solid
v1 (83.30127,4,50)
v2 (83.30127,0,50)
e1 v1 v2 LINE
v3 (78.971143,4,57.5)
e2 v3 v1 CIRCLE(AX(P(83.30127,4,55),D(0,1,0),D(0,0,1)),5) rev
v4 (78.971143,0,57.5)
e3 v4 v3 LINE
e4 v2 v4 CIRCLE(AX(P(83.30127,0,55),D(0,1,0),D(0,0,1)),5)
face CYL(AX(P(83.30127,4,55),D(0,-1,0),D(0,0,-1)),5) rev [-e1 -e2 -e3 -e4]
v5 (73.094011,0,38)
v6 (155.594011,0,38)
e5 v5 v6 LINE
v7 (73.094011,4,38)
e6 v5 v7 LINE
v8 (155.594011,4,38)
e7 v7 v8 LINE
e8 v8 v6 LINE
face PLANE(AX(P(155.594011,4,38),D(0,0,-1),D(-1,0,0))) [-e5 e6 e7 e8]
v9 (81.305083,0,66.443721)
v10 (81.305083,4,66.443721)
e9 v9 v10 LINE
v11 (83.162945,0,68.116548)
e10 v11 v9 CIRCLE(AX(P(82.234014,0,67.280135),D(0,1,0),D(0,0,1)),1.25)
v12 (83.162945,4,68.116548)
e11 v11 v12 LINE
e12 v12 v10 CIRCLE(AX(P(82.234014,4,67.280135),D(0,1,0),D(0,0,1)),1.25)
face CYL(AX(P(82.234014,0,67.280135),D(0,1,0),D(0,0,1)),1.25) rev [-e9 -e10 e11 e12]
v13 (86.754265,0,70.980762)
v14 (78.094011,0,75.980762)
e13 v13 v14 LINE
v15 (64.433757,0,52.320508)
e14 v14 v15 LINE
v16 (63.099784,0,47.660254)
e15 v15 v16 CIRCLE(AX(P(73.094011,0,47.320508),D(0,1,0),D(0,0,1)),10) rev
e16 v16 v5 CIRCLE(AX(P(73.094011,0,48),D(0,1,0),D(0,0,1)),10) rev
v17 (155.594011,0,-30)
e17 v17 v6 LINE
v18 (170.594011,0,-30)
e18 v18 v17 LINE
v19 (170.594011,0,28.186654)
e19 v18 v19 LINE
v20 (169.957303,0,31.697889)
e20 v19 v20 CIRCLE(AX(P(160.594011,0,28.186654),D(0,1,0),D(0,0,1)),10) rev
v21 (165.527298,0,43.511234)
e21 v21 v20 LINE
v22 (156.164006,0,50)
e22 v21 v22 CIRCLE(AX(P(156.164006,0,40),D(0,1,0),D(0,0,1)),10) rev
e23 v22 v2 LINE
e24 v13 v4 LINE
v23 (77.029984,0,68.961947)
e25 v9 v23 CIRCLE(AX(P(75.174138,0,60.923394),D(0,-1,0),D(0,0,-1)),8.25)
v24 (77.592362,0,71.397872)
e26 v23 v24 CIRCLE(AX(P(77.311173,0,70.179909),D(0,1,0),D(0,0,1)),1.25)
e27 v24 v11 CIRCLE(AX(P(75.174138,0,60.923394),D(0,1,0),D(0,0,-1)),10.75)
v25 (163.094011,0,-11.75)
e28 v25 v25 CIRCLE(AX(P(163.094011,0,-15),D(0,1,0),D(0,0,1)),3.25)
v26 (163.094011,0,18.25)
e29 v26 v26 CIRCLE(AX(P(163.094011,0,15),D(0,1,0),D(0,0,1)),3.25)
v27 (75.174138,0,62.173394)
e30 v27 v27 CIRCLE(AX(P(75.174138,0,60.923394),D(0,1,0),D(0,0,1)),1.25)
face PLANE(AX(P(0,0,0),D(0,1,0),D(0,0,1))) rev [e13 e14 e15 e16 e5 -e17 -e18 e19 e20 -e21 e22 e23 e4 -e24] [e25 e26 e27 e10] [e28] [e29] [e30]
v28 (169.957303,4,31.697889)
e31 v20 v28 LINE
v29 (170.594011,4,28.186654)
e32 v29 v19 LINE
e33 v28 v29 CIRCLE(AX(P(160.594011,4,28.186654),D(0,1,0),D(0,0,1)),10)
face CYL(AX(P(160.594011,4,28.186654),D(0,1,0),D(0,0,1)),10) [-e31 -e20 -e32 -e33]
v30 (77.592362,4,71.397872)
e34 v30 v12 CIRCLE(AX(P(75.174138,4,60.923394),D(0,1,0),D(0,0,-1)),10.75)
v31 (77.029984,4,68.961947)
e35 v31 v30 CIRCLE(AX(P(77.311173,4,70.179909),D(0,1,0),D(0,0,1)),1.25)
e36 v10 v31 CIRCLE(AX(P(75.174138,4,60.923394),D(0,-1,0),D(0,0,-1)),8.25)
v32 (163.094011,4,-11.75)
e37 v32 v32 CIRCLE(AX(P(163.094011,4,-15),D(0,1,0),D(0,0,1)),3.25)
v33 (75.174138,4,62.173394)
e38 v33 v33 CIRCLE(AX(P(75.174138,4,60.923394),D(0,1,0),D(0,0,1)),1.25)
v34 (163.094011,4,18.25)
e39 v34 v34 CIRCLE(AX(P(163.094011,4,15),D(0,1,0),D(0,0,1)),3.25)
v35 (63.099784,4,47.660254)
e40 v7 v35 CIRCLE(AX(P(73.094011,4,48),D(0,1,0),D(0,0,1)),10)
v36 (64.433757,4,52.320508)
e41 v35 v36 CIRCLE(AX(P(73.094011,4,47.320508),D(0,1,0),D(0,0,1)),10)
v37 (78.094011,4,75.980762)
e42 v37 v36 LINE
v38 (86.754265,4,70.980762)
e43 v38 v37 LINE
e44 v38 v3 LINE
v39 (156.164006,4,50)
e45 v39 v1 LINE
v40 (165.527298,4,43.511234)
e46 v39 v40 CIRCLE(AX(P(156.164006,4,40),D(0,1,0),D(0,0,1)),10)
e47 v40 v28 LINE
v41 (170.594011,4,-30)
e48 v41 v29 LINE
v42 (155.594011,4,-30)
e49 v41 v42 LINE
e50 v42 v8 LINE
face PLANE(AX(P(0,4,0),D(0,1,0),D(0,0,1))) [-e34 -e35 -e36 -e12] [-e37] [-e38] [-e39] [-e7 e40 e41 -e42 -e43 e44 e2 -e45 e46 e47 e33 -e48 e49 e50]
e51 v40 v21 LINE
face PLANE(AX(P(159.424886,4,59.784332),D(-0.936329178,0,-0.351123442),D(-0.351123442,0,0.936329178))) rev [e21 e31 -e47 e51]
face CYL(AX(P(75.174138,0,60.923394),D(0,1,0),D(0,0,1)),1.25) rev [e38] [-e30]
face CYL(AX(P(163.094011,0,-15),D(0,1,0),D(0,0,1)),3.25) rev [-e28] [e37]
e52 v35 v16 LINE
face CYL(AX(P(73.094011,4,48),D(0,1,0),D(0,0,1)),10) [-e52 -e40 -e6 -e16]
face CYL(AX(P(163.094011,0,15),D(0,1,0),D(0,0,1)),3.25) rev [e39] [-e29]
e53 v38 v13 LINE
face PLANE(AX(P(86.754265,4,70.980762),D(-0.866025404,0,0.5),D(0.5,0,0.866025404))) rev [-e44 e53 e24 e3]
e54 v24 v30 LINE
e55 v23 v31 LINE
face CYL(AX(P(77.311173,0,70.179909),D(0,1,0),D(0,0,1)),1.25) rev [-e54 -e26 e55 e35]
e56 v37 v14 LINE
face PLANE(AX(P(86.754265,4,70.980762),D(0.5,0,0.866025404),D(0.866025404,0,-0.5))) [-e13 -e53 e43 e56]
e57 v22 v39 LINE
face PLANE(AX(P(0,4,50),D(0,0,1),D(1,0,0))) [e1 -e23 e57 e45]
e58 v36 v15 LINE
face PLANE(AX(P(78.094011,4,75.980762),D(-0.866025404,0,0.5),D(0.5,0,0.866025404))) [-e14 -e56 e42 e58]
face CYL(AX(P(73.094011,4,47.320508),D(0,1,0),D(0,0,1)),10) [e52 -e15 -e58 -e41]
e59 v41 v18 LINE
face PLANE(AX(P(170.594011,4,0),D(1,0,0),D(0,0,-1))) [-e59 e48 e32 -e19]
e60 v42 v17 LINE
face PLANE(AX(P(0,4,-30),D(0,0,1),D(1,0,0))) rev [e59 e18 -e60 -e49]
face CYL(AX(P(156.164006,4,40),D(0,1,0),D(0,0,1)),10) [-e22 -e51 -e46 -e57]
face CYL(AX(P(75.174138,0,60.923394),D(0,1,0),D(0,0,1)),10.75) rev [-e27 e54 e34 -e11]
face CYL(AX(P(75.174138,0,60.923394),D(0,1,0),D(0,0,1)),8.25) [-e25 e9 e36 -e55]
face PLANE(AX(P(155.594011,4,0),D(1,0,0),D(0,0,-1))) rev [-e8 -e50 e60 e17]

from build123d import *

# Parameters (mm, degrees)
BOSS_EXTRUDE1_DEPTH = 4
SKETCH2_W           = 92.5
SKETCH2_H           = 8
CUT_EXTRUDE1_DEPTH  = 187.792378648
SKETCH3_R           = 1.25
CUT_EXTRUDE2_DEPTH  = 187.792378648
SKETCH4_R           = 3.25
CUT_EXTRUDE3_DEPTH  = 187.792378648
FILLET1_R           = 10
FILLET2_R           = 5
CUT_EXTRUDE4_DEPTH  = 187.792378648


with BuildPart() as part:
    # Sketch1 → Boss-Extrude1 (new body)
    with BuildSketch(Plane(origin=(0, 0, 0), x_dir=(1, 0, 0), z_dir=(0, 1, 0))):
        Polygon((155.594010768, -30), (63.094010768, -30), (63.094010768, -50), (78.094010768, -75.980762114), (86.754264805, -70.980762114), (74.641016151, -50), (163.094010768, -50), (170.594010768, -30), (170.594010768, 30), (155.594010768, 30), align=None)
    extrude(amount=BOSS_EXTRUDE1_DEPTH)

    # Sketch2 → Cut-Extrude1 (cut, through all)
    with BuildSketch(Plane(origin=(0, 0, 0), x_dir=(1, 0, 0), z_dir=(0, 1, 0))):
        with Locations((109.344010768, -34)):
            Rectangle(SKETCH2_W, SKETCH2_H)
    extrude(amount=CUT_EXTRUDE1_DEPTH, mode=Mode.SUBTRACT)

    # Sketch3 → Cut-Extrude2 (cut, through all)
    with BuildSketch(Plane(origin=(0, 4, 0), x_dir=(1, 0, 0), z_dir=(0, 1, 0))):
        with Locations(Location((75.174137787, -60.923393759, 0), (0, 0, 270))):
            Circle(SKETCH3_R)
        with Locations(Location((79.924137787, -69.150635095, 0), (0, 0, 270))):
            Circle(SKETCH3_R)
    extrude(amount=-CUT_EXTRUDE2_DEPTH, mode=Mode.SUBTRACT)

    # Sketch4 → Cut-Extrude3 (cut, through all)
    with BuildSketch(Plane(origin=(0, 4, 0), x_dir=(1, 0, 0), z_dir=(0, 1, 0))):
        with Locations(Location((163.094010768, 15, 0), (0, 0, 270))):
            Circle(SKETCH4_R)
        with Locations(Location((163.094010768, -15, 0), (0, 0, 270))):
            Circle(SKETCH4_R)
    extrude(amount=-CUT_EXTRUDE3_DEPTH, mode=Mode.SUBTRACT)

    # Fillet1
    # the kernel refuses this fillet: 10 mm, written as the material it takes off along each edge
    with BuildSketch(Plane(origin=(63.094010768, -6.698729811, 50), x_dir=(0, 0, -1), z_dir=(0, 1, 0))) as fillet1_piece_1:
        with BuildLine():
            CenterArc((FILLET1_R * 0.267949192431, -FILLET1_R), FILLET1_R, 90, 30)
            Line((-FILLET1_R * 0.232050807569, -FILLET1_R * 0.133974596216), (0, 0))
            Line((0, 0), (FILLET1_R * 0.267949192431, 0))
        make_face()
    extrude(amount=17.397459622, mode=Mode.SUBTRACT)
    with BuildSketch(Plane(origin=(63.094010768, -25, 38), x_dir=(1, 0, 0), z_dir=(0, 1, 0))) as fillet1_piece_2:
        with BuildLine():
            CenterArc((FILLET1_R, -FILLET1_R), FILLET1_R, 90, 90)
            Line((0, -FILLET1_R), (0, 0))
            Line((0, 0), (FILLET1_R, 0))
        make_face()
    extrude(amount=54, mode=Mode.SUBTRACT)
    with BuildSketch(Plane(origin=(163.094010768, -17.325011704, 50), x_dir=(0.35112344158838954, 0, -0.9363291775690453), z_dir=(0, 1, 0))) as fillet1_piece_3:
        with BuildLine():
            CenterArc((FILLET1_R * 0.693000468165, FILLET1_R), FILLET1_R, 200.55604522, 69.44395478)
            Line((-FILLET1_R * 0.243328709404, FILLET1_R * 0.648876558412), (0, 0))
            Line((0, 0), (FILLET1_R * 0.693000468165, 0))
        make_face()
    extrude(amount=38.650023408, mode=Mode.SUBTRACT)
    with BuildSketch(Plane(origin=(170.594010768, -4.533364544, 30), x_dir=(0, 0, -1), z_dir=(0, 1, 0))) as fillet1_piece_4:
        with BuildLine():
            CenterArc((FILLET1_R * 0.181334581773, FILLET1_R), FILLET1_R, 249.44395478, 20.55604522)
            Line((-FILLET1_R * 0.169788859816, FILLET1_R * 0.063670822431), (0, 0))
            Line((0, 0), (FILLET1_R * 0.181334581773, 0))
        make_face()
    extrude(amount=13.066729089, mode=Mode.SUBTRACT)

    # Fillet2
    fillet2_edges = [part.edges().sort_by_distance(p)[0] for p in [
        (74.641016151, 2, 50),
    ]]
    fillet(fillet2_edges, radius=FILLET2_R)

    # Sketch5 → Cut-Extrude4 (cut, through all)
    with BuildSketch(Plane(origin=(0, 4, 0), x_dir=(1, 0, 0), z_dir=(0, 1, 0))):
        with BuildLine():
            ThreePointArc((83.16294466, -68.116547777), (80.630175188, -70.185907233), (77.592361621, -71.397871955))
            ThreePointArc((77.592361621, -71.397871955), (76.093210222, -70.461098192), (77.029983985, -68.961946793))
            ThreePointArc((77.029983985, -68.961946793), (79.361329281, -68.031834332), (81.305082597, -66.443721261))
            ThreePointArc((81.305082597, -66.443721261), (83.070426886, -66.351203487), (83.16294466, -68.116547777))
        make_face()
    extrude(amount=-CUT_EXTRUDE4_DEPTH, mode=Mode.SUBTRACT)


solid = part.part
